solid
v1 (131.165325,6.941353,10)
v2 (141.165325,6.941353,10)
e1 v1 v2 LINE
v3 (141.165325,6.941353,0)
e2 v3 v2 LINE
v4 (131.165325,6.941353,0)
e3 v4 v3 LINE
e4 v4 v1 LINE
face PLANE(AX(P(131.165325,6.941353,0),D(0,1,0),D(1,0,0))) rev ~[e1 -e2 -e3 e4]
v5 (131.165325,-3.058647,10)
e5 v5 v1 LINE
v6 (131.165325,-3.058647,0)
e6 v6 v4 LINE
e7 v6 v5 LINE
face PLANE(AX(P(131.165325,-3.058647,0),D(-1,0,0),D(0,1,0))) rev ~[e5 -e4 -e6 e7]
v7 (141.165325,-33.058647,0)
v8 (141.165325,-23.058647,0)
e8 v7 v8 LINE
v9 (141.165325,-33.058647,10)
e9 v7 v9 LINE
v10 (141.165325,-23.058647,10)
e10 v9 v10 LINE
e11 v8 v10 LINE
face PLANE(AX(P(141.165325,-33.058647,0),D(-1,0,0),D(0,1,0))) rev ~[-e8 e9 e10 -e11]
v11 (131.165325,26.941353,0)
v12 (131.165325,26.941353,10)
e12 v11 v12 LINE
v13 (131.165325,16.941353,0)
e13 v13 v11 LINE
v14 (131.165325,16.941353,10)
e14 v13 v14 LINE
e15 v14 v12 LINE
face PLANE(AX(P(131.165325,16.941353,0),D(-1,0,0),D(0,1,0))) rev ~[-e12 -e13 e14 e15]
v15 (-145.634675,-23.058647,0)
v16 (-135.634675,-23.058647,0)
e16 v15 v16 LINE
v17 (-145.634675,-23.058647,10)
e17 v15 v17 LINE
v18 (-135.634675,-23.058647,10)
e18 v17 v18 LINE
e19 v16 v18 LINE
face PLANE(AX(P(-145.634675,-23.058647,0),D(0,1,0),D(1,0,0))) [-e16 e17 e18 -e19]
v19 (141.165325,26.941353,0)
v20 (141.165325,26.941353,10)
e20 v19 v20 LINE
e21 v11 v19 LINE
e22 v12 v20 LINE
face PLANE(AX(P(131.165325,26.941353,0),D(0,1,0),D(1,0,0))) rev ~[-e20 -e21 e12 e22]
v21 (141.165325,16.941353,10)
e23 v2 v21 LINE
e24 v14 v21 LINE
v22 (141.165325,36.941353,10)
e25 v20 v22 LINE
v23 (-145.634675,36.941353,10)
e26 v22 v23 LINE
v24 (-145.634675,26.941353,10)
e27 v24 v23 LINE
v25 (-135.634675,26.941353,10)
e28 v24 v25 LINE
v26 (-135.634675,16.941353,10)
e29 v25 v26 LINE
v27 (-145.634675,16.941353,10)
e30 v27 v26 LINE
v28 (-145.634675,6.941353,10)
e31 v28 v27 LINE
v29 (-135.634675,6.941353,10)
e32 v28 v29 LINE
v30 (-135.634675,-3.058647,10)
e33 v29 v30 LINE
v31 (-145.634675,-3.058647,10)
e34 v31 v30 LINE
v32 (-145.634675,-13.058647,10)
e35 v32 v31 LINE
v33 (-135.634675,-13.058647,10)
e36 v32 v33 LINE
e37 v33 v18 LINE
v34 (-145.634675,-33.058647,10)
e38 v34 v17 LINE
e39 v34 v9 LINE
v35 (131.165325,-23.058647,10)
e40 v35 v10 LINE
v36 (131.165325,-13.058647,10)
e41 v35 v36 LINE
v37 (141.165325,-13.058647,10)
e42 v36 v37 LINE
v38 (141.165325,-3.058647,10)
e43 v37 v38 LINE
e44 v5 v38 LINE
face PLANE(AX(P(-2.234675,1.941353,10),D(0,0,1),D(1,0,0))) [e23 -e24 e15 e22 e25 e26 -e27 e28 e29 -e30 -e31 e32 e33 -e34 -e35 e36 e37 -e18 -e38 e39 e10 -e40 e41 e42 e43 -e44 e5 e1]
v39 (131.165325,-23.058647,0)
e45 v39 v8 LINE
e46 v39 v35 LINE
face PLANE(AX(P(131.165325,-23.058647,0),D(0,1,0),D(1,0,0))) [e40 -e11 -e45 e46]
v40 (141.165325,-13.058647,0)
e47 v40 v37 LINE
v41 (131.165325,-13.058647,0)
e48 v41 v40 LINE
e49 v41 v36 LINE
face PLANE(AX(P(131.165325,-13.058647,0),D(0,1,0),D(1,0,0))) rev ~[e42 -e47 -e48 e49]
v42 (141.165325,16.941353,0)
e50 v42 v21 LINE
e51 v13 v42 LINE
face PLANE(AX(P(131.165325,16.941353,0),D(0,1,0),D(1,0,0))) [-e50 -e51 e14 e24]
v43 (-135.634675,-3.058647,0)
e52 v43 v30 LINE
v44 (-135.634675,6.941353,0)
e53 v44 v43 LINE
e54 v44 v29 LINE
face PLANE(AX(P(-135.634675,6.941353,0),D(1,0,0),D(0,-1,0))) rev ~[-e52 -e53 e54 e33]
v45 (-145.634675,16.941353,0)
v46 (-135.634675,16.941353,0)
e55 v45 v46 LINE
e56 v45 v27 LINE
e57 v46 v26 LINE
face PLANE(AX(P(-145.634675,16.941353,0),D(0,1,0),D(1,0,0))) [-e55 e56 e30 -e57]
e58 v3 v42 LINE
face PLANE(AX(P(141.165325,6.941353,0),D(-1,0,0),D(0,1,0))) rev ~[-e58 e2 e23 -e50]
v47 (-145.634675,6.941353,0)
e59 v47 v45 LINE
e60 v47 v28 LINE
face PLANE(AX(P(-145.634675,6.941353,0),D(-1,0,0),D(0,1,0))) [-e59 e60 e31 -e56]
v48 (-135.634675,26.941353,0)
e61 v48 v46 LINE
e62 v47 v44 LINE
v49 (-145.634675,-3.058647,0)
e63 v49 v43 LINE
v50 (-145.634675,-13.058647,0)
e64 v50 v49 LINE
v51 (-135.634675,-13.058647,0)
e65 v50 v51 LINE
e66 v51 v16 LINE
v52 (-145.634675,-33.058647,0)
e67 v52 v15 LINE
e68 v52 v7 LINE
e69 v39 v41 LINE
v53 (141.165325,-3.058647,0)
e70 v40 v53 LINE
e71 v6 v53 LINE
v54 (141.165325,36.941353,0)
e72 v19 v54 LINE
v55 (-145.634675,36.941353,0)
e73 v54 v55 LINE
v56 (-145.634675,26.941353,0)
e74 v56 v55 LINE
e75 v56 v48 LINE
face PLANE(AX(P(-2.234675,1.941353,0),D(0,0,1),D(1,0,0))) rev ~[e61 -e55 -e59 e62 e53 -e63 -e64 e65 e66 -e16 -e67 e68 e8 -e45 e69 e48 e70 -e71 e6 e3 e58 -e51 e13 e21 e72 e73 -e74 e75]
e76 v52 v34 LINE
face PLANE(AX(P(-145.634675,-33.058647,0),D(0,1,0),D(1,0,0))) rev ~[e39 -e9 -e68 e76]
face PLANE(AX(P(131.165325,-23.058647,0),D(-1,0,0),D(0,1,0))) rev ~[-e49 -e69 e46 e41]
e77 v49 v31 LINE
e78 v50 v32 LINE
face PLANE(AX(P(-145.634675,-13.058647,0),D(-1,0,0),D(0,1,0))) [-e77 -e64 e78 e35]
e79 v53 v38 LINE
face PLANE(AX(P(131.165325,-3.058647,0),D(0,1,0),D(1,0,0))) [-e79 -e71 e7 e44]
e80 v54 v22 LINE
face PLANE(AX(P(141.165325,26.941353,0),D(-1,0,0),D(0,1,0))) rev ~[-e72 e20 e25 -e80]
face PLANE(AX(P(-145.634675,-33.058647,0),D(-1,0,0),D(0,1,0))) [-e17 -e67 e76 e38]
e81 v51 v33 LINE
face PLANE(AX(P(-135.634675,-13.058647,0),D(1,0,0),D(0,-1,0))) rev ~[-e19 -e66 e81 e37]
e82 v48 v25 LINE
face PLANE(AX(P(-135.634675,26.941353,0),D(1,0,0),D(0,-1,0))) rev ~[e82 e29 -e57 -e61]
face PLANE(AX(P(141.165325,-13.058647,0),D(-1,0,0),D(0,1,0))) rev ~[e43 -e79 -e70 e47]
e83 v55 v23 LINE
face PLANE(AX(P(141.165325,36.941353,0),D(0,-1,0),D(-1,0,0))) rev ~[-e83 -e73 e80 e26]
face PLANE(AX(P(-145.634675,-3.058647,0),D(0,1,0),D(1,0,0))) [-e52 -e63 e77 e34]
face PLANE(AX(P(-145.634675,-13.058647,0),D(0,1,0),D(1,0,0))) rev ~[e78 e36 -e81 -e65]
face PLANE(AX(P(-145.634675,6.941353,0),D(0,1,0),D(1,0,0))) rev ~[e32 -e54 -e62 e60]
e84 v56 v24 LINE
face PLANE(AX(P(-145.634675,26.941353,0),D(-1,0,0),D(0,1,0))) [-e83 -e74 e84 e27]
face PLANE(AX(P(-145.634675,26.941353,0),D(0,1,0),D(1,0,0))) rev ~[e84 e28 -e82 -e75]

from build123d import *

# Parameters (mm, degrees)
F0_W     = 10
F0_H     = 10
F1_DEPTH = 10


# Not quite as in the source:
# - a feature names something its author has since deleted; it is built from what else it names


with BuildPart() as f1:
    # F0 (on Top) → F1 (new body)
    with BuildSketch(Plane.XY):
        Polygon((131.1653250098, 36.9413525529), (-135.6346749902, 36.9413525529), (-135.6346749902, 26.9413525529), (-135.6346749902, 16.9413525529), (-135.6346749902, 6.9413525529), (-135.6346749902, -3.0586474471), (-135.6346749902, -13.0586474471), (-135.6346749902, -23.0586474471), (-135.6346749902, -33.0586474471), (131.1653250098, -33.0586474471), (131.1653250098, -23.0586474471), (131.1653250098, -13.0586474471), (131.1653250098, -3.0586474471), (131.1653250098, 6.9413525529), (131.1653250098, 16.9413525529), (131.1653250098, 26.9413525529), align=None)
        with Locations((-140.6346749902, 31.9413525529)):
            Rectangle(F0_W, F0_H)
        with Locations((-140.6346749902, 11.9413525529)):
            Rectangle(F0_W, F0_H)
        with Locations((-140.6346749902, -8.0586474471)):
            Rectangle(F0_W, F0_H)
        with Locations((-140.6346749902, -28.0586474471)):
            Rectangle(F0_W, F0_H)
        with Locations((136.1653250098, 31.9413525529)):
            Rectangle(F0_W, F0_H)
        with Locations((136.1653250098, 11.9413525529)):
            Rectangle(F0_W, F0_H)
        with Locations((136.1653250098, -8.0586474471)):
            Rectangle(F0_W, F0_H)
        with Locations((136.1653250098, -28.0586474471)):
            Rectangle(F0_W, F0_H)
    extrude(amount=F1_DEPTH)


solid = f1.part
